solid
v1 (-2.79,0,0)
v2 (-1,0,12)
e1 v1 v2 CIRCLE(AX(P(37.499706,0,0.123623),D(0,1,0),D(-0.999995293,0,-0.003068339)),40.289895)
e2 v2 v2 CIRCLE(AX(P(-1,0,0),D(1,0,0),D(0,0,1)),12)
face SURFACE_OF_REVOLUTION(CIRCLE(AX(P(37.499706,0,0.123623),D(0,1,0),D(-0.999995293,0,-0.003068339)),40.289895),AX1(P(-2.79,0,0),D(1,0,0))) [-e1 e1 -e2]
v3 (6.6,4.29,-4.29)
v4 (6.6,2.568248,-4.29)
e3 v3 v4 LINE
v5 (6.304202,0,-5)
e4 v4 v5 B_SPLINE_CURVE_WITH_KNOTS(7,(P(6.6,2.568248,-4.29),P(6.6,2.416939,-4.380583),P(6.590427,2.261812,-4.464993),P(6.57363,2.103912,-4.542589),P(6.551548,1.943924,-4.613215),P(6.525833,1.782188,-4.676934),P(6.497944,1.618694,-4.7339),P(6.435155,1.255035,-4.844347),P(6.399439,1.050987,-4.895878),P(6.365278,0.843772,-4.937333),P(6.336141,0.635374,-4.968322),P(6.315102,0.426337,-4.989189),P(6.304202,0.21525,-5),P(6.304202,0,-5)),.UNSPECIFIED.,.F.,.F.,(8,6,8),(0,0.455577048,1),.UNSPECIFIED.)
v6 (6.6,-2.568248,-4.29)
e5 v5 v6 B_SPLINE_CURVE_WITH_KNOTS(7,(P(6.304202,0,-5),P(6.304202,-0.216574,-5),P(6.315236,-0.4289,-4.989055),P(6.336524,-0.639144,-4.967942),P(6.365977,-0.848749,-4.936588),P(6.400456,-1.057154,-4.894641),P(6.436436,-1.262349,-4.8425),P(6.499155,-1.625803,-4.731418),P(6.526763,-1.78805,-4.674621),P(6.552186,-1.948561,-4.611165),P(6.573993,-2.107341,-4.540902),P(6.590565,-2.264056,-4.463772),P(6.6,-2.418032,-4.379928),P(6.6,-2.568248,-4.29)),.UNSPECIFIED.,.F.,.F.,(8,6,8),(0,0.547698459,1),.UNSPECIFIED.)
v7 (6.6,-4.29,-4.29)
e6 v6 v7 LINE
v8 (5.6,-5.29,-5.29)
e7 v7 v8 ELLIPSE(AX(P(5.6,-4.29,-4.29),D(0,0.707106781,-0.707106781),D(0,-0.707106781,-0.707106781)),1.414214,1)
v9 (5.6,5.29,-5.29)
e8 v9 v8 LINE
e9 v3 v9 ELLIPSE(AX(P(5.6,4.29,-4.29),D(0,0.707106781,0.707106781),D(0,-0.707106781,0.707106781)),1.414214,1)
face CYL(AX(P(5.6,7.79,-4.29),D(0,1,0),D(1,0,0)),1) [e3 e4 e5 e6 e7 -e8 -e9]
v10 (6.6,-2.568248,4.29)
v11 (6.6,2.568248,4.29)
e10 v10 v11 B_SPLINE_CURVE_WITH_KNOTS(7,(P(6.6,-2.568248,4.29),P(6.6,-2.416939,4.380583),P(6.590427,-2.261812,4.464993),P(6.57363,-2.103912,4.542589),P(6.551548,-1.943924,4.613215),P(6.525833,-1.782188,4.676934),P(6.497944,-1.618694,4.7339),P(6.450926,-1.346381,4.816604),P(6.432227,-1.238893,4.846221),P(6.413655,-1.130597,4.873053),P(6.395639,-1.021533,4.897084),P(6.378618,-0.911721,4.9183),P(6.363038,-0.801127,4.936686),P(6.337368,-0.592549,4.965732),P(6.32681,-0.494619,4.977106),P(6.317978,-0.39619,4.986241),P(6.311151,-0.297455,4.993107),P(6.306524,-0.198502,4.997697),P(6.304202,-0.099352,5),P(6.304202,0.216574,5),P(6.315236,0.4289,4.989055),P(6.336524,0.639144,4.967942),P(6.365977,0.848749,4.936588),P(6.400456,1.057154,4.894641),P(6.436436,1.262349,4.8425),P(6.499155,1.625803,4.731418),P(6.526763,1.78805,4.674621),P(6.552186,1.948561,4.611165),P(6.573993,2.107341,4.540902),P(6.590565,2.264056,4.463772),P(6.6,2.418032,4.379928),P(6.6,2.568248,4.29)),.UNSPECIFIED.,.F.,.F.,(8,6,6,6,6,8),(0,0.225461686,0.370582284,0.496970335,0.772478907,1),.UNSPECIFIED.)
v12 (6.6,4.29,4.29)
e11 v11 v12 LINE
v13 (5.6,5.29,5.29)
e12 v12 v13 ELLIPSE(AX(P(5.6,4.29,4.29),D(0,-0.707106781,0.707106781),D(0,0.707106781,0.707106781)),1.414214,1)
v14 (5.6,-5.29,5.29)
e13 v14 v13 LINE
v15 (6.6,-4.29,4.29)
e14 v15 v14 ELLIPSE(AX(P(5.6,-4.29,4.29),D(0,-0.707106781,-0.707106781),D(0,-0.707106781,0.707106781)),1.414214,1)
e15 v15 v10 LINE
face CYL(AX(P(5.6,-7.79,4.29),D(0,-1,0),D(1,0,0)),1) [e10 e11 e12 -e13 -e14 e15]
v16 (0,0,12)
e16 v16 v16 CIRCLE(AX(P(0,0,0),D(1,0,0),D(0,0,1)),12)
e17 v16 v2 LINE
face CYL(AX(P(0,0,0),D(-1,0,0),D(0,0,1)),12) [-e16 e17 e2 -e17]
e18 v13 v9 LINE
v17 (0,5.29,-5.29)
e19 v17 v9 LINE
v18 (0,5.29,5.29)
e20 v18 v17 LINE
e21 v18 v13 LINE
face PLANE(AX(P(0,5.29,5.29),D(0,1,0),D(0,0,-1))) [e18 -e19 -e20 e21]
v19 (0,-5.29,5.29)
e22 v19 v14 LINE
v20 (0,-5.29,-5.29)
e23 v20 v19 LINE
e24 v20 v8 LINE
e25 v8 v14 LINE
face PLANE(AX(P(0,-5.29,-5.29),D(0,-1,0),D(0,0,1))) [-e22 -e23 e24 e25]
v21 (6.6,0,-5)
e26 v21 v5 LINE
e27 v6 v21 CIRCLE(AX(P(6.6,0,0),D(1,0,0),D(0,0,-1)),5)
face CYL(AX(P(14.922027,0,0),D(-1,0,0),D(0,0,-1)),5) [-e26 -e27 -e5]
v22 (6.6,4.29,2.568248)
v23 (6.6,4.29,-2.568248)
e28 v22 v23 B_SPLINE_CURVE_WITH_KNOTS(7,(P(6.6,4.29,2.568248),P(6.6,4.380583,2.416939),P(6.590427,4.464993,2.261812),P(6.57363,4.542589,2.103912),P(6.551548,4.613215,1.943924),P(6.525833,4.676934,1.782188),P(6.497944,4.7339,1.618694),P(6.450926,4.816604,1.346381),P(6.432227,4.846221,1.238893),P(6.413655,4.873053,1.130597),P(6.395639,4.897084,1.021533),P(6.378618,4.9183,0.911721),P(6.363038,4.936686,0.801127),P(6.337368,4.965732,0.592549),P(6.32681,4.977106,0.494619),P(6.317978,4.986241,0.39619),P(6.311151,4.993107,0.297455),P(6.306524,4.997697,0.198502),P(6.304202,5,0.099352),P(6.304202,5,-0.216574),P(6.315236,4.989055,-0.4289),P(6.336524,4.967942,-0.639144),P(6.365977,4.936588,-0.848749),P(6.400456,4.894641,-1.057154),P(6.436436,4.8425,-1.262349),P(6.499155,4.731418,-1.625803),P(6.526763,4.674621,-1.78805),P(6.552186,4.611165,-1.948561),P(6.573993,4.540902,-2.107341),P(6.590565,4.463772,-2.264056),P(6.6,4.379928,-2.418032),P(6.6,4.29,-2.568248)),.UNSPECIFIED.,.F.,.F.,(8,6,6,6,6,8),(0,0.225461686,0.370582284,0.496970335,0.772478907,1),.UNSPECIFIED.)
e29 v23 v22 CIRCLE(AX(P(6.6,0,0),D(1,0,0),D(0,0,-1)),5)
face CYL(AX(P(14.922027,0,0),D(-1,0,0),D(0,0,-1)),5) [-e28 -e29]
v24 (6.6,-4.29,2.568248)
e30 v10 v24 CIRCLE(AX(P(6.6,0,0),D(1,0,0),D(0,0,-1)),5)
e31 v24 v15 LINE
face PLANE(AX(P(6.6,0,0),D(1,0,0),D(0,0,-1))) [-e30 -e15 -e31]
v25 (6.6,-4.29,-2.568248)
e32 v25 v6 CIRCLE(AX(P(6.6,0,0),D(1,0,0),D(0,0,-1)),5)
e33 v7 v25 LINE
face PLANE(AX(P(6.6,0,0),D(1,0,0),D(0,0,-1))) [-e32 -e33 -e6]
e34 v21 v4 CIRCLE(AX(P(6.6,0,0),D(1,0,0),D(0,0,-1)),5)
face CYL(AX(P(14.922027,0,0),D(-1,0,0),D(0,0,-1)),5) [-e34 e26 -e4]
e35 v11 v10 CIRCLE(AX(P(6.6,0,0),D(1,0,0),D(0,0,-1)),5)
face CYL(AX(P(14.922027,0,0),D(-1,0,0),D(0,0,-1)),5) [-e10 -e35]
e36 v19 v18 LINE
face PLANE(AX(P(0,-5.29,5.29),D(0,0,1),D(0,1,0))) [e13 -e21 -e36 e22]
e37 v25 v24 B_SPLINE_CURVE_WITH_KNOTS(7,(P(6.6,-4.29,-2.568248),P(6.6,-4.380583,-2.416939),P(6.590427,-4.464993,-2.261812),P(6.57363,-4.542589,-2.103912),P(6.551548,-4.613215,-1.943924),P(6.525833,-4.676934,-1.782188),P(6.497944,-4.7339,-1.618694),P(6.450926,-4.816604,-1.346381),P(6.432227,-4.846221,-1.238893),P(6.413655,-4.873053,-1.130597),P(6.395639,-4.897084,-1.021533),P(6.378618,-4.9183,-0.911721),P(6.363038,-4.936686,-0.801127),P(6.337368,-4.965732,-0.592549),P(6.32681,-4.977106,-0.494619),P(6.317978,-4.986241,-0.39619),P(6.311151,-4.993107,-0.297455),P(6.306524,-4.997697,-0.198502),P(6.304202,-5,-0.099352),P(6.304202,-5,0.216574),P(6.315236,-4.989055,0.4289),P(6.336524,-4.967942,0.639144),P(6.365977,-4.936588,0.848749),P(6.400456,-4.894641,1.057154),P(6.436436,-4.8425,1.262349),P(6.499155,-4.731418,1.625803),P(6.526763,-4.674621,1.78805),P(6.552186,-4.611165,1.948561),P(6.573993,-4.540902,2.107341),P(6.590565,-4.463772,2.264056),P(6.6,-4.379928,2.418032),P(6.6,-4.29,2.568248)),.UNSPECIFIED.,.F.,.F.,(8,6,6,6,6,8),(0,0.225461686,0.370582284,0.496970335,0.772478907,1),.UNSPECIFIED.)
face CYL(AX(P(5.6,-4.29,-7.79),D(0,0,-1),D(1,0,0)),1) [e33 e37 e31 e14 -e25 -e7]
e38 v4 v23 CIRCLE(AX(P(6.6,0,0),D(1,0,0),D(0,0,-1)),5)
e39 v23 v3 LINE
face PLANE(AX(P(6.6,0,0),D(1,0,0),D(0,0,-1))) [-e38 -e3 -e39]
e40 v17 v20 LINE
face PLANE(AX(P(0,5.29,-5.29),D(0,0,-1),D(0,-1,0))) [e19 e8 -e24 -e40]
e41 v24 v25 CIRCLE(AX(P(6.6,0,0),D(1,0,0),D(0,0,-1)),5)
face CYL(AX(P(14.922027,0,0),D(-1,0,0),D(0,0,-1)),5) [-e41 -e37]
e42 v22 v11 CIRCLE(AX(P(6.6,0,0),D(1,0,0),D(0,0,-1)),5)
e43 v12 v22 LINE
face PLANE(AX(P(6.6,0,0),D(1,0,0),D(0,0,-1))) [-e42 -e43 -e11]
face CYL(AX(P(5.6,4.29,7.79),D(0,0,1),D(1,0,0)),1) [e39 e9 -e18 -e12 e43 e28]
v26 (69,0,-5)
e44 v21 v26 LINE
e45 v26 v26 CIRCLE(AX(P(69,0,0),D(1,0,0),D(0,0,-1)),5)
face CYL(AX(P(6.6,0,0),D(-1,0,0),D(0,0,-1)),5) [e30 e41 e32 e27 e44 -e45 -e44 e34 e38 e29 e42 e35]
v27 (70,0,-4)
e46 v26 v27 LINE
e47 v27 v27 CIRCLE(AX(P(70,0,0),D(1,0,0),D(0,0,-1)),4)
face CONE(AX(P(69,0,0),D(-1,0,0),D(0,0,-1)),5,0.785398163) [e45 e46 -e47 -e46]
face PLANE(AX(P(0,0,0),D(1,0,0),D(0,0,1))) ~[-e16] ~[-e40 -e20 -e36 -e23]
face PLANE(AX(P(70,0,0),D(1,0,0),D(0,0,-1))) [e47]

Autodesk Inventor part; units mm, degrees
ref_plane "YZ Plane" through (0, 0, 0) normal (1, 0, 0) x (0, 1, 0)
ref_plane "XZ Plane" through (0, 0, 0) normal (0, 1, 0) x (-1, 0, 0)
ref_plane "XY Plane" through (0, 0, 0) normal (0, 0, 1) x (1, 0, 0)
sketch "Náčrt1" plane through (0, 0, 0) normal (0, 1, 0) x (-1, 0, 0)
  line L0 (0, 0) -> (0, 12)
  line L1 (0, 12) -> (1, 12)
  arc A0 (2.79, 0) -> (1, 12) centre (-37.5014, 0.1235) ccw
  line L2 (2.79, 0) -> (0, 0)
  dimension "d0" = 12
  dimension "d1" = 1
revolve "Rotace1" add sketch "Náčrt1" angle 360 about axis through (-2.79, 0, 0) along (1, 0, 0)
sketch "Náčrt2" plane through (0, 0, 0) normal (1, 0, 0) x (0, 0, -1)
  line L0 (-5.29, 5.29) -> (5.29, 5.29)
  line L1 (5.29, 5.29) -> (5.29, -5.29)
  line L2 (5.29, -5.29) -> (-5.29, -5.29)
  line L3 (-5.29, -5.29) -> (-5.29, 5.29)
  point P0 (0, 0)
  dimension "d3" = 10.58
  dimension "d4" = 10.58
  dimension "d5" = 5.29
  dimension "d6" = 5.29
extrude "Vysunutí1" add sketch "Náčrt2" along normal blind 6.6
sketch "Náčrt3" plane through (6.6, 0, 0) normal (1, 0, 0) x (0, 0, -1)
  circle A0 centre (0, 0) radius 5
  dimension "d9" = 10
extrude "Vysunutí2" add sketch "Náčrt3" along normal blind 63.4
chamfer "Zkosení1" distance 1 angle 45 1 edges at (70, 0, 5)
fillet "Zaoblení1" radius 1 4 edges at (6.6, 5.29, 0) (6.6, 0, 5.29) (6.6, -5.29, 0) (6.6, 0, -5.29)
thread "Závit1" size "M10x1.5" class "6g" standard "ANSI Metric M Profile" full length
properties part number "Šroub M10x70"
